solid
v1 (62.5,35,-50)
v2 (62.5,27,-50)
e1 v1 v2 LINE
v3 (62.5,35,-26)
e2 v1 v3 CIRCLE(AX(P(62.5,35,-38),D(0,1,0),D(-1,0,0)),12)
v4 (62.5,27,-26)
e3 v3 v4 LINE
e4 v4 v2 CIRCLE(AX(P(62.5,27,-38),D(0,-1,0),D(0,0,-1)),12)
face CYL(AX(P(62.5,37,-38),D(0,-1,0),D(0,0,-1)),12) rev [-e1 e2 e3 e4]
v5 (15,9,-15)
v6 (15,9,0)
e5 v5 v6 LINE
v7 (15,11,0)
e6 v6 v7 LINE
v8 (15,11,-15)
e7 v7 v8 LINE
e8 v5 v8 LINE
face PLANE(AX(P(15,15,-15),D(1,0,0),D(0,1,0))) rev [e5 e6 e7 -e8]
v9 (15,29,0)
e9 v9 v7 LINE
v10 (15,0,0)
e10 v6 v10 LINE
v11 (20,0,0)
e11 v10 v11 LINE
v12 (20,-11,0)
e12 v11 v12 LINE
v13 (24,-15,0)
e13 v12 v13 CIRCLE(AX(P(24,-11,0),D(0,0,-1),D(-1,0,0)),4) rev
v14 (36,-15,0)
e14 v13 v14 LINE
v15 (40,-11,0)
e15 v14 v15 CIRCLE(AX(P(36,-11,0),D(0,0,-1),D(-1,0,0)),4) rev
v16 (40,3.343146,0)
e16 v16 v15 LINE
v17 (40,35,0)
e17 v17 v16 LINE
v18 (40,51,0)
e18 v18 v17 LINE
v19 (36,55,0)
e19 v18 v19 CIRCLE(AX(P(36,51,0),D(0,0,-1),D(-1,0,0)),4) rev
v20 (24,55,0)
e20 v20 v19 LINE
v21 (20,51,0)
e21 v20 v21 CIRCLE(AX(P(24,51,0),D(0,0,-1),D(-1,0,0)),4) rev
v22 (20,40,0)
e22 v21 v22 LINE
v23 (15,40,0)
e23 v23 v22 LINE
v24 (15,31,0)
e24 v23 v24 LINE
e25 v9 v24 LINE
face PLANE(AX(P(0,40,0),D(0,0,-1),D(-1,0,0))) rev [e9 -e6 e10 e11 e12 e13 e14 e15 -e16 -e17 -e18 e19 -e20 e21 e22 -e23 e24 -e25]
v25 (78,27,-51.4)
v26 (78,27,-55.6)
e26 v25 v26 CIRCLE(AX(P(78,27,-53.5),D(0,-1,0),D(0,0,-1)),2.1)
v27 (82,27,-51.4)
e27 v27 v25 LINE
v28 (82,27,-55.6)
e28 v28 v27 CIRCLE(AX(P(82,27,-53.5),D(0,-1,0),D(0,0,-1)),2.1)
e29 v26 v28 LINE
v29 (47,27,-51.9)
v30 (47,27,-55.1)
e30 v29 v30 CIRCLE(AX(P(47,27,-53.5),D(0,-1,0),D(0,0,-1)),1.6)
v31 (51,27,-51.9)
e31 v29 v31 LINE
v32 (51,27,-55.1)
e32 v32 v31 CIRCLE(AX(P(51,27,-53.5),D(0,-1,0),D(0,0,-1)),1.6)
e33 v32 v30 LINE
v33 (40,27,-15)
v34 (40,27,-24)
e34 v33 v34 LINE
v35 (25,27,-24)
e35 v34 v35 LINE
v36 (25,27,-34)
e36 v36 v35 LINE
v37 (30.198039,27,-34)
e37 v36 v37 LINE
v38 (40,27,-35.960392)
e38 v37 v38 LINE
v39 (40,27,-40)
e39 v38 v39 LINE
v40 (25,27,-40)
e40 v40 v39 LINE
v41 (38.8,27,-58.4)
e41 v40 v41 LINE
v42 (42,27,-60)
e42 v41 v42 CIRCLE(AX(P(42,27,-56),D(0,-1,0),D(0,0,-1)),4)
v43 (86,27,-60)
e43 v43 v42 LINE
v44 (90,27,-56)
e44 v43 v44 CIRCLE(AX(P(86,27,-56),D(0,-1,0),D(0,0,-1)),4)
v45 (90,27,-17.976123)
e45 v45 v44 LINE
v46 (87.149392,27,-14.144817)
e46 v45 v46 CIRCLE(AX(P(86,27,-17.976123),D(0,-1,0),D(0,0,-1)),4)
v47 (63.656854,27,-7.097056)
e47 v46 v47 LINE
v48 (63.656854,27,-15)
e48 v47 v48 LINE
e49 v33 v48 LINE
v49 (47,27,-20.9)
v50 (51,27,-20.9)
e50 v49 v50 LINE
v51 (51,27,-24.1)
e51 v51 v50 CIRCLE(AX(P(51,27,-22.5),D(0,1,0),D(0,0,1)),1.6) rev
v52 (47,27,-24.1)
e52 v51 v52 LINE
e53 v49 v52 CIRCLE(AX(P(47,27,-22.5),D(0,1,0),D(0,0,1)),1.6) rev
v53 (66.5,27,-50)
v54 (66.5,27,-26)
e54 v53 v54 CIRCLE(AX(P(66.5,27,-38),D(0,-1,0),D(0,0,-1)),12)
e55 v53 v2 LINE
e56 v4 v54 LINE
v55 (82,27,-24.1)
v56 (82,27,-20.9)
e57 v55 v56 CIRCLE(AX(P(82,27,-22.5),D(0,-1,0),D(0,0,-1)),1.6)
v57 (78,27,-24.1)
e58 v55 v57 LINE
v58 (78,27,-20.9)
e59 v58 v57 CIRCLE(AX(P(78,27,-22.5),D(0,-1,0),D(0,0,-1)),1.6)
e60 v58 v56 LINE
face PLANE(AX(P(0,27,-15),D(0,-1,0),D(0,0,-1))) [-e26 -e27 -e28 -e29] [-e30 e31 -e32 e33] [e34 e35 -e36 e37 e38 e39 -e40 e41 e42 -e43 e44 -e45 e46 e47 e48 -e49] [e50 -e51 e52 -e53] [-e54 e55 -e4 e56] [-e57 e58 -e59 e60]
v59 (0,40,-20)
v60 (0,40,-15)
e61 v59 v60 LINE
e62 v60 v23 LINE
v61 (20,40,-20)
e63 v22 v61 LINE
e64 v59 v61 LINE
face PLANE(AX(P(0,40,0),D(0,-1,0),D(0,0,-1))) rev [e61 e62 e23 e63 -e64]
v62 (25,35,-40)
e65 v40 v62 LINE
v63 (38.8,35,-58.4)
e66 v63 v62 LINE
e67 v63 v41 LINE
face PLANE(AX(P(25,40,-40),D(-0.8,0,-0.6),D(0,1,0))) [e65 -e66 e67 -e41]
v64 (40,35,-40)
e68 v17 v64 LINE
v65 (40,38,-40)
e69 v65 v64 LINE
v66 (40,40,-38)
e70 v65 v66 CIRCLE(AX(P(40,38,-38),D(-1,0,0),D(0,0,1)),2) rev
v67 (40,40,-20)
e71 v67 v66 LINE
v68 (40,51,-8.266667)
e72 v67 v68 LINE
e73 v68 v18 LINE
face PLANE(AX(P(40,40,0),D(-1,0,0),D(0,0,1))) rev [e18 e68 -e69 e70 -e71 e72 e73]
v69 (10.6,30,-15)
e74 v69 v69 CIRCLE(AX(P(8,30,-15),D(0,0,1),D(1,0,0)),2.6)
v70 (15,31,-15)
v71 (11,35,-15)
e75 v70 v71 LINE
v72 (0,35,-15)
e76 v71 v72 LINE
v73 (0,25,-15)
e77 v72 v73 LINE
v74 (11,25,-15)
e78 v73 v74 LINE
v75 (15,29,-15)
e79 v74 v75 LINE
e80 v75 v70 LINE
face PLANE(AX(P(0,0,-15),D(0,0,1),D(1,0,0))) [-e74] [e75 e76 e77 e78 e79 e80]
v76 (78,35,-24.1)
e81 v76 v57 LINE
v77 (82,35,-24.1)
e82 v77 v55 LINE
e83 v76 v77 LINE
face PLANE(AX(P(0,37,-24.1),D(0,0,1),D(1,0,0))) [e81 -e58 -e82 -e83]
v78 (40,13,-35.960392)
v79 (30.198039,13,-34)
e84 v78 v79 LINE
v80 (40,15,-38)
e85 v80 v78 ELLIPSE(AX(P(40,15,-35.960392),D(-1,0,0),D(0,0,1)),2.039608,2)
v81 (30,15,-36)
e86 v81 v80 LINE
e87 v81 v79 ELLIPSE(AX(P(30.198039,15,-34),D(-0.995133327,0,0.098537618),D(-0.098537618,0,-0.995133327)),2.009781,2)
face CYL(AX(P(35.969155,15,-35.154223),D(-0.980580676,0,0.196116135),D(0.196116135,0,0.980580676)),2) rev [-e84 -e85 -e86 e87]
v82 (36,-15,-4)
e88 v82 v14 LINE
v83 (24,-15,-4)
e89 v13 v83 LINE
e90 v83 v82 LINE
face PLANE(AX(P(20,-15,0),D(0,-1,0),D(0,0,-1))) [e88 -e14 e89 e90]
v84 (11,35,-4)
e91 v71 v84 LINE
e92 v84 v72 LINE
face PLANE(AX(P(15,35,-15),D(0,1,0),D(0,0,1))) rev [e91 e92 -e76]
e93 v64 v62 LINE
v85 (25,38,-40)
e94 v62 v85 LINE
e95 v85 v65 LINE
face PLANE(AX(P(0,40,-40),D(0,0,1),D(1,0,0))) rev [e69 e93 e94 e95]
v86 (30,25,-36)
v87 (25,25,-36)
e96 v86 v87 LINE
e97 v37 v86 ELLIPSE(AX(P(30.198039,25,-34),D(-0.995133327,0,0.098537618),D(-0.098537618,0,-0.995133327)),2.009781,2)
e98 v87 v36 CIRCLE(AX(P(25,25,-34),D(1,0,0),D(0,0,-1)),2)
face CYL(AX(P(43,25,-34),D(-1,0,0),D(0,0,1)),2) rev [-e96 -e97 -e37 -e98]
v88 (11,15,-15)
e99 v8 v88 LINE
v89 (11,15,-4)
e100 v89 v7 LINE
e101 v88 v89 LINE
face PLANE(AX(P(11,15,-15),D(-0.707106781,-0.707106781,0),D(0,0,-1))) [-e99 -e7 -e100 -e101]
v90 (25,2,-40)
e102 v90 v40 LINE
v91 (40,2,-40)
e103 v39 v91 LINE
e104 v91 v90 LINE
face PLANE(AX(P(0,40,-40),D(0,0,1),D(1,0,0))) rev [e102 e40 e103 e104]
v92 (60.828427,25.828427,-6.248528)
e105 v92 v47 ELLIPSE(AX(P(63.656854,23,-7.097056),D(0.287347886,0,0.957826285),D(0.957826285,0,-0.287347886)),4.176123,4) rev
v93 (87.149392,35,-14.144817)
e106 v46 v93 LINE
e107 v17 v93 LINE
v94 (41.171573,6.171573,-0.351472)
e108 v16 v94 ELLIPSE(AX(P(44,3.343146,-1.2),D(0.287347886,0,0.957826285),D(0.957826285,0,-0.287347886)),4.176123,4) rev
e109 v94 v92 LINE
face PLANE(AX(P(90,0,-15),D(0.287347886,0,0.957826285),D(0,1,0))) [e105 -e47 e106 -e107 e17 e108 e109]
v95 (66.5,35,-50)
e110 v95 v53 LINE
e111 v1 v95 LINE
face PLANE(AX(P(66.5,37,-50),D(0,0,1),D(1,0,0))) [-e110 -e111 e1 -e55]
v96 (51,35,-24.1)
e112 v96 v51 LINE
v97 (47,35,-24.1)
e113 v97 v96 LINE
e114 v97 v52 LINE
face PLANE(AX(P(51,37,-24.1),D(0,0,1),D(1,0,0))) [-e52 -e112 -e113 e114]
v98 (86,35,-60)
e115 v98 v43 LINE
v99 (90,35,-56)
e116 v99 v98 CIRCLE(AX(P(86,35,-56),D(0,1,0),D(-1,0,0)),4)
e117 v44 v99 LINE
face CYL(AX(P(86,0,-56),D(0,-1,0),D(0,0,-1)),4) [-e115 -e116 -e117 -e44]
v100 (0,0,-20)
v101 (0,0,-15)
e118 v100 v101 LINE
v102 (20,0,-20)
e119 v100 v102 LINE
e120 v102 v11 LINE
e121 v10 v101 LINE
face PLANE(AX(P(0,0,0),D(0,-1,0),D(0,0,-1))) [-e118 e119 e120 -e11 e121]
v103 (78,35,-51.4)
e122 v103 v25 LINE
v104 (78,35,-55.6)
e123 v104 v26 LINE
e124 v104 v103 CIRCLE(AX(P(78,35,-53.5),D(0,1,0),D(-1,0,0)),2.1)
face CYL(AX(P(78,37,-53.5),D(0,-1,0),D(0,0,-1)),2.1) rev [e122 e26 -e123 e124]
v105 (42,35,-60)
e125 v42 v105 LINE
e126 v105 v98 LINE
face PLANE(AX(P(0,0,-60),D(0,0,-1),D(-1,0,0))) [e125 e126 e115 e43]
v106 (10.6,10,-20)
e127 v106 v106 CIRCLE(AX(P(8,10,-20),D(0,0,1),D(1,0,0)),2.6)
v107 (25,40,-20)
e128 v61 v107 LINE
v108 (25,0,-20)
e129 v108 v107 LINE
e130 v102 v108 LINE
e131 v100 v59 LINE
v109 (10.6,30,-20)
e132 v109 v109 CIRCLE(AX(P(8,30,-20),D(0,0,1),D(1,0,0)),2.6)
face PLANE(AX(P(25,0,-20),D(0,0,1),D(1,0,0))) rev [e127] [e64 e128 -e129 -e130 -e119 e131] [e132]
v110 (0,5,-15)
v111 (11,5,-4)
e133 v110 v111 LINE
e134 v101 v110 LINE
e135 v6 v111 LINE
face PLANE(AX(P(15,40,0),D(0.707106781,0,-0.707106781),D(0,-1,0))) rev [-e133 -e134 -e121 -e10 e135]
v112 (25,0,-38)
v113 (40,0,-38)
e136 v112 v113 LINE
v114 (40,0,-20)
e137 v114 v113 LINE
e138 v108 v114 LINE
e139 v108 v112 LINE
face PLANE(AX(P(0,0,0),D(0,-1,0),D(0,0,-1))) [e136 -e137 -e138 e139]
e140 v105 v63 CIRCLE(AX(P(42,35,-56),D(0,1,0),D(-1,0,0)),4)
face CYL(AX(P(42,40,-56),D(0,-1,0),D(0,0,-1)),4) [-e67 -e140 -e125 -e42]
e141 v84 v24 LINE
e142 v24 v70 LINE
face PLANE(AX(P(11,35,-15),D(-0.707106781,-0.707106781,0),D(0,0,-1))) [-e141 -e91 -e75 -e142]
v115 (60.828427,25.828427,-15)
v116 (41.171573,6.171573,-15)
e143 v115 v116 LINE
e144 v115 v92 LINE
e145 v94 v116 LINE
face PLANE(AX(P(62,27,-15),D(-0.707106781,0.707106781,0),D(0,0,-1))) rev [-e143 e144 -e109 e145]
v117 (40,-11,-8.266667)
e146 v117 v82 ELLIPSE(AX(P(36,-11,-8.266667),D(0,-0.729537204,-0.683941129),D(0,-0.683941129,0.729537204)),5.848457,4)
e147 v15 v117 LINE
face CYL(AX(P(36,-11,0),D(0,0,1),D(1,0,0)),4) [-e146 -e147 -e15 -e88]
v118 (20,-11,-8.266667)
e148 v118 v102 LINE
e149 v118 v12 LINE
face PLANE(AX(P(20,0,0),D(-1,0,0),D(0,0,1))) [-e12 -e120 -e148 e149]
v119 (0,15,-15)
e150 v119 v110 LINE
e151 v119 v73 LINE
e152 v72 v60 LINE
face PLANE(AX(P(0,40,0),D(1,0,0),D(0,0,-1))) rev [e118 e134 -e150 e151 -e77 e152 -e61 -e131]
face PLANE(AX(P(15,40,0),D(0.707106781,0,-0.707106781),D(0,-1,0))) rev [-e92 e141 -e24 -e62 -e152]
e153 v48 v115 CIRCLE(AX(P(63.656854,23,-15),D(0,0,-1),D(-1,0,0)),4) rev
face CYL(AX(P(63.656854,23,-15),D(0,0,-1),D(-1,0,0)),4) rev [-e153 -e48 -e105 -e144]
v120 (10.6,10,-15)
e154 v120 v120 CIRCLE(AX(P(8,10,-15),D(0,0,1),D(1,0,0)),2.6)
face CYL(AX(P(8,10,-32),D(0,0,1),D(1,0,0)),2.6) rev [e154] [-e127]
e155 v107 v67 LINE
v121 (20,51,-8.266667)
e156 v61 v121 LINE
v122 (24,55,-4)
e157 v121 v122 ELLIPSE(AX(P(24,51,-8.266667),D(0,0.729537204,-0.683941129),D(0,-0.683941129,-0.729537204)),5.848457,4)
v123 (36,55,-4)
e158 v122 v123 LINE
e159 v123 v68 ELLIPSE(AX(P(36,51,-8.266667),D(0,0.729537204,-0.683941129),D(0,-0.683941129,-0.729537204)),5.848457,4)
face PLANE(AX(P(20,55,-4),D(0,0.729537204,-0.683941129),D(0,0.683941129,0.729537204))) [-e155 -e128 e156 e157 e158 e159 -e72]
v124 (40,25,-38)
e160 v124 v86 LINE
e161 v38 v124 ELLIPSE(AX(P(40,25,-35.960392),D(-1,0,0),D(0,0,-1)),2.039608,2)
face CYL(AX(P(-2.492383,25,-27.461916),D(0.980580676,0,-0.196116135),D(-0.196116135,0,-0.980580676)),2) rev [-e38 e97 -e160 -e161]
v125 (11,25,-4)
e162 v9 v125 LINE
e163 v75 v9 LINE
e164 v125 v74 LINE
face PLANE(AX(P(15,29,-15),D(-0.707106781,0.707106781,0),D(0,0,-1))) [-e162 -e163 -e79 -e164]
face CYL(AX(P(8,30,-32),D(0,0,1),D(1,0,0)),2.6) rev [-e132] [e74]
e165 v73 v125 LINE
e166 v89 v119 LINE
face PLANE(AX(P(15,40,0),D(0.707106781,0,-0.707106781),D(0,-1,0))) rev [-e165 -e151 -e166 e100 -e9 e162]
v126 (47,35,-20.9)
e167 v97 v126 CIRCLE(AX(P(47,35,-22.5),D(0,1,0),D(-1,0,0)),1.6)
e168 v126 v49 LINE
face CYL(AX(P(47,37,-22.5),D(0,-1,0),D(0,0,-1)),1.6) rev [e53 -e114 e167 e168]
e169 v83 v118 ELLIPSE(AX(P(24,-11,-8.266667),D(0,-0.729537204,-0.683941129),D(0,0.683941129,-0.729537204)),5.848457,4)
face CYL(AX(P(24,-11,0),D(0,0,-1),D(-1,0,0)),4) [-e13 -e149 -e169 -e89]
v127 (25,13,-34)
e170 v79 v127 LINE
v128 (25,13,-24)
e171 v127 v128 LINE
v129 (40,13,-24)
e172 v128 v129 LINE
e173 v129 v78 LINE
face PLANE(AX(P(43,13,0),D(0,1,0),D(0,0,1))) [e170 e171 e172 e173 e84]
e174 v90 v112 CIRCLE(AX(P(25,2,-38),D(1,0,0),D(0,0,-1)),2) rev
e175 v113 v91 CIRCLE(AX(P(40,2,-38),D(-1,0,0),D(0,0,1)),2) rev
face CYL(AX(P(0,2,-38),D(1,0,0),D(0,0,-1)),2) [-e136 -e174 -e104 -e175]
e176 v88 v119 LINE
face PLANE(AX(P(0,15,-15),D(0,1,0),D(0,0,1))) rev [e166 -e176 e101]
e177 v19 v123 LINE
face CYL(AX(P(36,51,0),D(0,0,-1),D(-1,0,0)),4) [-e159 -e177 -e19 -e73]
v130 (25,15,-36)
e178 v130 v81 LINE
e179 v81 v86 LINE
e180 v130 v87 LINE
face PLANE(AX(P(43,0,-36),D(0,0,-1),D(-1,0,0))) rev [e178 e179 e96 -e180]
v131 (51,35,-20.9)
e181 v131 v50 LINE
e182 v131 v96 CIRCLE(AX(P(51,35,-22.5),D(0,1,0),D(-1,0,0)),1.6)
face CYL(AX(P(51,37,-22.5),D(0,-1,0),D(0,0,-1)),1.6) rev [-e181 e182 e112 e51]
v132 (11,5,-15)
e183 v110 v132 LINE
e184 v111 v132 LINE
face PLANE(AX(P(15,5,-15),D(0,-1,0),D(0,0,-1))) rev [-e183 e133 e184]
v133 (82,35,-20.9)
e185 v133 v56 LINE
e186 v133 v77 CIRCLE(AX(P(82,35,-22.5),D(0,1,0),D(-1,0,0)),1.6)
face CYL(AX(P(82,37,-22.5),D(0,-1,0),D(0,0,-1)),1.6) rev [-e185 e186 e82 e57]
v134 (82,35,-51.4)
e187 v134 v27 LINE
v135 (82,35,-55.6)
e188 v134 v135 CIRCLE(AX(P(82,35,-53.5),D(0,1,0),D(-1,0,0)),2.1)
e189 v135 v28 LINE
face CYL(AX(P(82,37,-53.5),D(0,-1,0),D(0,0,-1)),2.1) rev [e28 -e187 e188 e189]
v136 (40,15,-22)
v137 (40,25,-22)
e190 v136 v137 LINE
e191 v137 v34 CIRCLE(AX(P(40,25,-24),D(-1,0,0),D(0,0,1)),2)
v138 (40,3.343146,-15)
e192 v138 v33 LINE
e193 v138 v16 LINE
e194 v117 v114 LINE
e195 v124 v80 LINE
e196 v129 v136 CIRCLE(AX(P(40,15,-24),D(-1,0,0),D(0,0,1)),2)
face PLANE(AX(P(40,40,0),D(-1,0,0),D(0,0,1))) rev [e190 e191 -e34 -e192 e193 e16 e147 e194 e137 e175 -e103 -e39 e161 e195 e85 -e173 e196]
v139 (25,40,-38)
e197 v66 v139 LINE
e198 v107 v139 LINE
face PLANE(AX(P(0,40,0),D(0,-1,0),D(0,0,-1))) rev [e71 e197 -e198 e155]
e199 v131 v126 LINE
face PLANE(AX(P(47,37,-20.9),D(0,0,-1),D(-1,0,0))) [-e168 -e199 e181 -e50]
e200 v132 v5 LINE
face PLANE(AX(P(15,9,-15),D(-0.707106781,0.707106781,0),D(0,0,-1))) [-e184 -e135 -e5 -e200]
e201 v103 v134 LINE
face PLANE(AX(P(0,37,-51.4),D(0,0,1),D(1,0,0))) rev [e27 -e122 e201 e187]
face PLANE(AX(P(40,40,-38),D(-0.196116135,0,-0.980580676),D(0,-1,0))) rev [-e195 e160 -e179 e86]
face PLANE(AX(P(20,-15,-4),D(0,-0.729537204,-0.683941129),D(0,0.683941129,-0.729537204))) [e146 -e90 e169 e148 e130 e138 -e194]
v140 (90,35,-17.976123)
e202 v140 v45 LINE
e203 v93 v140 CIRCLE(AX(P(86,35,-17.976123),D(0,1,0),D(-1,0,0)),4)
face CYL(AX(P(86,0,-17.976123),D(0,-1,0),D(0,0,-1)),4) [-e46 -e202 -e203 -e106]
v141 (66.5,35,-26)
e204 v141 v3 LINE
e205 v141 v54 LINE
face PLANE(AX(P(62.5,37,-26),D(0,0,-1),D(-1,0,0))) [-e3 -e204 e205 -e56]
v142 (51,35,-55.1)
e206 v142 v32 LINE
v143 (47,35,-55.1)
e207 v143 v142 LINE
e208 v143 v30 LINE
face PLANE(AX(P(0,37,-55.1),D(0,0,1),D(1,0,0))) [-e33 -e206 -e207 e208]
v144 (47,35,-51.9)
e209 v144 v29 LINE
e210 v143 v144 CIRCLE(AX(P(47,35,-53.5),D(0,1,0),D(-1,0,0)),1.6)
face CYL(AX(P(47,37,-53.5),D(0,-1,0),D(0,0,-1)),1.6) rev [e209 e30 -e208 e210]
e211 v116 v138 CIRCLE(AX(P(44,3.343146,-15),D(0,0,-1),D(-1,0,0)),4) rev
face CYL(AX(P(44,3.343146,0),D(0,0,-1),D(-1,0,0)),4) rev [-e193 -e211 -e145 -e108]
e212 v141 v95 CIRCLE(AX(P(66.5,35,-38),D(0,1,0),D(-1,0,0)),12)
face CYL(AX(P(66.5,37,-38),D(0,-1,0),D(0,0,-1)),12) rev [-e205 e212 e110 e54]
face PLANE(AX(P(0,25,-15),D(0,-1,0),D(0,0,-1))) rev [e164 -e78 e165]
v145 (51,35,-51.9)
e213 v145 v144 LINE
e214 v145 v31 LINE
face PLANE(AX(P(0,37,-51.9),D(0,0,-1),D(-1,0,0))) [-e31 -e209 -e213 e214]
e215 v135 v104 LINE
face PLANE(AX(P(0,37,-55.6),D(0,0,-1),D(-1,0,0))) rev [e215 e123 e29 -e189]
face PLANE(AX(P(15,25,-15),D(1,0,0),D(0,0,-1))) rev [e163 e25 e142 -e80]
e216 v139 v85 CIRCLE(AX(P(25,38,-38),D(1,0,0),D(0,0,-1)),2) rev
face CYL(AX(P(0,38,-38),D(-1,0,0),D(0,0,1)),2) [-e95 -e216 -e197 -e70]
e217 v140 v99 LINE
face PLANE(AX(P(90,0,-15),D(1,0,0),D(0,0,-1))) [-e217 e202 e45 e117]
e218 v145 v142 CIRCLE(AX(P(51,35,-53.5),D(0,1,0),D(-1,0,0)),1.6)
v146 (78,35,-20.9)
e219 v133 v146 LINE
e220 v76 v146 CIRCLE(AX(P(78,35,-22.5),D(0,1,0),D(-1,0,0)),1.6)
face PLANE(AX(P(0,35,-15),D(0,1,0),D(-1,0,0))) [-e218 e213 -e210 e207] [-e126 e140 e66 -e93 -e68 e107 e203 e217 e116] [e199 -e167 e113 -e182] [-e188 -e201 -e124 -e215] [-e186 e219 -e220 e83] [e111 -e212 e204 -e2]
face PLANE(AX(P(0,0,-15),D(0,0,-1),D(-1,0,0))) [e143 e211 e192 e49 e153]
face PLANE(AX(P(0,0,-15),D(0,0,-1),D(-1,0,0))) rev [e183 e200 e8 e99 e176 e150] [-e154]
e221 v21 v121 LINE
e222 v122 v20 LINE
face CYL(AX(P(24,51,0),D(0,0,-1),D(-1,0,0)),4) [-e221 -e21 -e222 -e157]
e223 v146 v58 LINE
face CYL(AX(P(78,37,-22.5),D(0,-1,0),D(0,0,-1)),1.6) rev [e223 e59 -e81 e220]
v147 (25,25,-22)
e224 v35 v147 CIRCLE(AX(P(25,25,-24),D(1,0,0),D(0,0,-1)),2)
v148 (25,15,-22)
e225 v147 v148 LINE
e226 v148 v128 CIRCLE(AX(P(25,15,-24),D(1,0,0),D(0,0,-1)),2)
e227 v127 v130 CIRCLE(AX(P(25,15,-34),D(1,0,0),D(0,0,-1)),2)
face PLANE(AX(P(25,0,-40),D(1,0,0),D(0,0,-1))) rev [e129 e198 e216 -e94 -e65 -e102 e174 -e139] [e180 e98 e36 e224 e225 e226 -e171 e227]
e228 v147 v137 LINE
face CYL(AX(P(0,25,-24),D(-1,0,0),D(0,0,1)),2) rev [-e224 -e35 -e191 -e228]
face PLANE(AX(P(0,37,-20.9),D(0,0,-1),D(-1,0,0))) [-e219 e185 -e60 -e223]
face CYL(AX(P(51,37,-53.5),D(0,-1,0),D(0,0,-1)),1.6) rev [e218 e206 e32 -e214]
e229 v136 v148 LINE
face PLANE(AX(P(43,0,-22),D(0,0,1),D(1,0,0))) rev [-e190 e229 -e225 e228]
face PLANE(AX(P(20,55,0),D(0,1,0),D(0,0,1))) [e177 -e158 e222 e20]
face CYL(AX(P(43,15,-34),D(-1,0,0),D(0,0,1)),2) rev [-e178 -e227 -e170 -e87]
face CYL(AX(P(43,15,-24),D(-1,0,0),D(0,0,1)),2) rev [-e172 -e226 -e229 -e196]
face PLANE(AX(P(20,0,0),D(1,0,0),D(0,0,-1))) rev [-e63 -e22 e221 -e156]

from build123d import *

# Parameters (mm, degrees)
SKETCH1_W                = 40
SKETCH1_H                = 40
BOSS_EXTRUDE1_DEPTH      = 40
SKETCH2_W                = 25
SKETCH2_H                = 20
CUT_EXTRUDE1_DEPTH       = 40
CHAMFER1_SIZE            = 15
CUT_EXTRUDE2_DEPTH       = 15
CHAMFER2_SIZE            = 4
SKETCH4_R                = 2.6
CUT_EXTRUDE3_DEPTH       = 17
BOSS_EXTRUDE3_DEPTH      = 20
FILLET3_R                = 4
BOSS_EXTRUDE2_DEPTH      = 20
BOSS_EXTRUDE2_DEPTH_BACK = 25
SKETCH5_W                = 50
SKETCH5_H                = 8
CUT_EXTRUDE4_DEPTH       = 10
CHAMFER3_SIZE            = 15
CHAMFER3_SIZE_2          = 20
CHAMFER4_SIZE2           = 50
CHAMFER4_SIZE            = 15
FILLET5_START            = 26
FILLET5_DEPTH            = 10
FILLET6_R                = 2
CHAMFER5_START           = -40
CHAMFER5_DEPTH           = 40
CHAMFER5_START_2         = 2
CHAMFER5_2_DEPTH         = 25
SKETCH11_W               = 27.237482008
SKETCH11_H               = 25
CUT_EXTRUDE5_DEPTH       = 25
FILLET7_R                = 4
SKETCH16_W               = 14
SKETCH16_H               = 14
CUT_EXTRUDE6_DEPTH       = 43
CHAMFER6_SIZE            = 10
CHAMFER6_SIZE2           = 2
FILLET9_R                = 2


with BuildPart() as part:
    # Sketch1 → Boss-Extrude1 (new body)
    with BuildSketch(Plane(origin=(0, 0, 0), x_dir=(1, 0, 0), z_dir=(0, 1, 0))):
        with Locations((20, 20)):
            Rectangle(SKETCH1_W, SKETCH1_H)
    extrude(amount=BOSS_EXTRUDE1_DEPTH)

    # Sketch2 → Cut-Extrude1 (cut)
    with BuildSketch(Plane(origin=(0, 40, 0), x_dir=(1, 0, 0), z_dir=(0, 1, 0))):
        with Locations((12.5, 30)):
            Rectangle(SKETCH2_W, SKETCH2_H)
    extrude(amount=-CUT_EXTRUDE1_DEPTH, mode=Mode.SUBTRACT)

    # Chamfer1
    chamfer1_edges = [part.edges().sort_by_distance(p)[0] for p in [
        (0, 20, 0),
    ]]
    chamfer(chamfer1_edges, length=CHAMFER1_SIZE)

    # Sketch3 → Cut-Extrude2 (cut)
    with BuildSketch(Plane.XY):
        Polygon((0, 10), (0, 15), (15, 15), (15, 5), (0, 5), align=None)
        Polygon((0, 30), (0, 25), (15, 25), (15, 35), (0, 35), align=None)
    extrude(amount=-CUT_EXTRUDE2_DEPTH, mode=Mode.SUBTRACT)

    # Chamfer2
    chamfer2_edges = [part.edges().sort_by_distance(p)[0] for p in [
        (15, 35, -7.5),
        (15, 25, -7.5),
        (15, 15, -7.5),
        (15, 5, -7.5),
    ]]
    chamfer(chamfer2_edges, length=CHAMFER2_SIZE)

    # Sketch4 → Cut-Extrude3 (cut)
    with BuildSketch(Plane.XY.offset(-15)):
        with Locations((8, 30)):
            Circle(SKETCH4_R)
        with Locations((8, 10)):
            Circle(SKETCH4_R)
    extrude(amount=-CUT_EXTRUDE3_DEPTH, mode=Mode.SUBTRACT)

    # Sketch9 → Boss-Extrude3 (add)
    with BuildSketch(Plane(origin=(40, 0, 0), x_dir=(0, 0, -1), z_dir=(1, 0, 0))):
        Polygon((0, 40), (0, 55), (4, 55), (20, 40), align=None)
        Polygon((0, 0), (0, -15), (4, -15), (20, 0), align=None)
    extrude(amount=-BOSS_EXTRUDE3_DEPTH)

    # Fillet3
    fillet3_edges = [part.edges().sort_by_distance(p)[0] for p in [
        (20, 55, -2),
        (40, 55, -2),
        (20, -15, -2),
        (40, -15, -2),
    ]]
    fillet(fillet3_edges, radius=FILLET3_R)

    # Sketch5 → Boss-Extrude2 (add, two sides: drawn at the far end of the back side and taken through both)
    with BuildSketch(Plane(origin=(0, 0, -40), x_dir=(-1, 0, 0), z_dir=(0, 0, -1)).offset(-BOSS_EXTRUDE2_DEPTH_BACK)):
        with Locations((-65, 31)):
            Rectangle(SKETCH5_W, SKETCH5_H)
    extrude(amount=BOSS_EXTRUDE2_DEPTH + BOSS_EXTRUDE2_DEPTH_BACK)

    # Sketch10 → Cut-Extrude4 (cut)
    with BuildSketch(Plane(origin=(0, 27, 0), x_dir=(-1, 0, 0), z_dir=(0, -1, 0))):
        with BuildLine():
            ThreePointArc((-47, 51.9), (-45.4, 53.5), (-47, 55.1))
            Line((-47, 55.1), (-51, 55.1))
            ThreePointArc((-51, 55.1), (-52.13137085, 54.63137085), (-52.6, 53.5))
            ThreePointArc((-52.6, 53.5), (-52.13137085, 52.36862915), (-51, 51.9))
            Line((-51, 51.9), (-47, 51.9))
        make_face()
        with BuildLine():
            ThreePointArc((-47, 20.9), (-45.4, 22.5), (-47, 24.1))
            Line((-47, 24.1), (-51, 24.1))
            ThreePointArc((-51, 24.1), (-52.6, 22.5), (-51, 20.9))
            Line((-51, 20.9), (-47, 20.9))
        make_face()
        with BuildLine():
            ThreePointArc((-78, 20.9), (-76.4, 22.5), (-78, 24.1))
            Line((-78, 24.1), (-82, 24.1))
            ThreePointArc((-82, 24.1), (-83.6, 22.5), (-82, 20.9))
            Line((-82, 20.9), (-78, 20.9))
        make_face()
        with BuildLine():
            ThreePointArc((-66.5, 50), (-78.5, 38), (-66.5, 26))
            Line((-66.5, 26), (-62.5, 26))
            ThreePointArc((-62.5, 26), (-50.5, 38), (-62.5, 50))
            Line((-62.5, 50), (-66.5, 50))
        make_face()
        with BuildLine():
            ThreePointArc((-78, 51.4), (-75.9, 53.5), (-78, 55.6))
            Line((-78, 55.6), (-82, 55.6))
            ThreePointArc((-82, 55.6), (-84.1, 53.5), (-82, 51.4))
            Line((-82, 51.4), (-78, 51.4))
        make_face()
    extrude(amount=-CUT_EXTRUDE4_DEPTH, mode=Mode.SUBTRACT)

    # Chamfer3
    # the kernel refuses this chamfer: 20, 15 mm, written as the material it adds along each edge
    with BuildSketch(Plane(origin=(40, 27, -40), x_dir=(-1, 0, 0), z_dir=(0, 1, 0))) as chamfer3_piece_1:
        Polygon((CHAMFER3_SIZE, 0), (0, -CHAMFER3_SIZE_2), (0, 0), align=None)
    extrude(amount=8)

    # Chamfer4
    chamfer4_edges = [part.edges().sort_by_distance(p)[0] for p in [
        (40, 31, -15),
    ]]
    chamfer4_side = [part.faces().sort_by_distance(p)[0] for p in [
        (40, 31, -14.7),
    ]]
    chamfer(chamfer4_edges, length=CHAMFER4_SIZE - 0.0001, length2=CHAMFER4_SIZE2 - 0.0001, reference=chamfer4_side[0])  # a hair under: the kernel refuses the full size

    # Fillet5: read off the stored shape, not the designer's step
    # Fillet5 outline → Fillet5 (cut)
    with BuildSketch(Plane(origin=(0, 0, 0), x_dir=(1, 0, 0), z_dir=(0, 1, 0)).offset(FILLET5_START)):
        with BuildLine():
            Line((90, 15), (90, 17.976122604))
            ThreePointArc((90, 17.976122604), (89.209171713, 15.588400485), (87.149391542, 14.144817463))
            Line((87.149391542, 14.144817463), (90, 15))
        make_face()
        with BuildLine():
            ThreePointArc((38.8, 58.4), (40.211145618, 59.577708764), (42, 60))
            Line((42, 60), (40, 60))
            Line((40, 60), (38.8, 58.4))
        make_face()
        with BuildLine():
            ThreePointArc((86, 60), (88.828427125, 58.828427125), (90, 56))
            Line((90, 56), (90, 60))
            Line((90, 60), (86, 60))
        make_face()
    extrude(amount=FILLET5_DEPTH, mode=Mode.SUBTRACT)

    # Fillet6
    fillet6_edges = [part.edges().sort_by_distance(p)[0] for p in [
        (32.5, 40, -40),
        (32.5, 0, -40),
    ]]
    fillet(fillet6_edges, radius=FILLET6_R)

    # Chamfer5: read off the stored shape, not the designer's step
    # Chamfer5 outline → Chamfer5 (add)
    with BuildSketch(Plane.XY.offset(CHAMFER5_START)):
        Polygon((40, 5), (62, 27), (40, 27), align=None)
    extrude(amount=CHAMFER5_DEPTH)

    # Chamfer5 2 outline → Chamfer5 2 (cut)
    with BuildSketch(Plane(origin=(0, 0, 0), x_dir=(1, 0, 0), z_dir=(0, 1, 0)).offset(CHAMFER5_START_2)):
        with BuildLine():
            Line((51, 24.1), (47, 24.1))
            ThreePointArc((47, 24.1), (45.4, 22.5), (47, 20.9))
            Line((47, 20.9), (51, 20.9))
            ThreePointArc((51, 20.9), (52.6, 22.5), (51, 24.1))
        make_face()
        with BuildLine():
            ThreePointArc((50.667840434, 40), (53.33484861, 30.254033308), (62.5, 26))
            Line((62.5, 26), (64, 26))
            Line((64, 26), (64, 40))
            Line((64, 40), (50.667840434, 40))
        make_face()
        Polygon((64, 0), (64, 7.2), (40, 0), align=None)
    extrude(amount=CHAMFER5_2_DEPTH, mode=Mode.SUBTRACT)

    # Sketch11 → Cut-Extrude5 (cut)
    with BuildSketch(Plane(origin=(0, 0, -40), x_dir=(-1, 0, 0), z_dir=(0, 0, -1))):
        with Locations((-53.618741004, 14.5)):
            Rectangle(SKETCH11_W, SKETCH11_H)
    extrude(amount=-CUT_EXTRUDE5_DEPTH, mode=Mode.SUBTRACT)

    # Fillet7
    fillet7_edges = [part.edges().sort_by_distance(p)[0] for p in [
        (62, 27, -10.8000346),
        (40, 5, -7.5),
    ]]
    fillet(fillet7_edges, radius=FILLET7_R)

    # Sketch16 → Cut-Extrude6 (cut)
    with BuildSketch(Plane.ZY):
        with Locations((-29, 20)):
            Rectangle(SKETCH16_W, SKETCH16_H)
    extrude(amount=-CUT_EXTRUDE6_DEPTH, mode=Mode.SUBTRACT)

    # Chamfer6
    chamfer6_edges = [part.edges().sort_by_distance(p)[0] for p in [
        (40, 20, -36),
    ]]
    chamfer6_side = [part.faces().sort_by_distance(p)[0] for p in [
        (32.5, 20, -36),
    ]]
    chamfer(chamfer6_edges, length=CHAMFER6_SIZE, length2=CHAMFER6_SIZE2, reference=chamfer6_side[0])

    # Fillet9
    fillet9_edges = [part.edges().sort_by_distance(p)[0] for p in [
        (32.5, 13, -22),
        (32.5, 27, -22),
        (27.5, 27, -36),
        (27.5, 13, -36),
        (35, 13, -37),
        (35, 27, -37),
    ]]
    fillet(fillet9_edges, radius=FILLET9_R)


solid = part.part
